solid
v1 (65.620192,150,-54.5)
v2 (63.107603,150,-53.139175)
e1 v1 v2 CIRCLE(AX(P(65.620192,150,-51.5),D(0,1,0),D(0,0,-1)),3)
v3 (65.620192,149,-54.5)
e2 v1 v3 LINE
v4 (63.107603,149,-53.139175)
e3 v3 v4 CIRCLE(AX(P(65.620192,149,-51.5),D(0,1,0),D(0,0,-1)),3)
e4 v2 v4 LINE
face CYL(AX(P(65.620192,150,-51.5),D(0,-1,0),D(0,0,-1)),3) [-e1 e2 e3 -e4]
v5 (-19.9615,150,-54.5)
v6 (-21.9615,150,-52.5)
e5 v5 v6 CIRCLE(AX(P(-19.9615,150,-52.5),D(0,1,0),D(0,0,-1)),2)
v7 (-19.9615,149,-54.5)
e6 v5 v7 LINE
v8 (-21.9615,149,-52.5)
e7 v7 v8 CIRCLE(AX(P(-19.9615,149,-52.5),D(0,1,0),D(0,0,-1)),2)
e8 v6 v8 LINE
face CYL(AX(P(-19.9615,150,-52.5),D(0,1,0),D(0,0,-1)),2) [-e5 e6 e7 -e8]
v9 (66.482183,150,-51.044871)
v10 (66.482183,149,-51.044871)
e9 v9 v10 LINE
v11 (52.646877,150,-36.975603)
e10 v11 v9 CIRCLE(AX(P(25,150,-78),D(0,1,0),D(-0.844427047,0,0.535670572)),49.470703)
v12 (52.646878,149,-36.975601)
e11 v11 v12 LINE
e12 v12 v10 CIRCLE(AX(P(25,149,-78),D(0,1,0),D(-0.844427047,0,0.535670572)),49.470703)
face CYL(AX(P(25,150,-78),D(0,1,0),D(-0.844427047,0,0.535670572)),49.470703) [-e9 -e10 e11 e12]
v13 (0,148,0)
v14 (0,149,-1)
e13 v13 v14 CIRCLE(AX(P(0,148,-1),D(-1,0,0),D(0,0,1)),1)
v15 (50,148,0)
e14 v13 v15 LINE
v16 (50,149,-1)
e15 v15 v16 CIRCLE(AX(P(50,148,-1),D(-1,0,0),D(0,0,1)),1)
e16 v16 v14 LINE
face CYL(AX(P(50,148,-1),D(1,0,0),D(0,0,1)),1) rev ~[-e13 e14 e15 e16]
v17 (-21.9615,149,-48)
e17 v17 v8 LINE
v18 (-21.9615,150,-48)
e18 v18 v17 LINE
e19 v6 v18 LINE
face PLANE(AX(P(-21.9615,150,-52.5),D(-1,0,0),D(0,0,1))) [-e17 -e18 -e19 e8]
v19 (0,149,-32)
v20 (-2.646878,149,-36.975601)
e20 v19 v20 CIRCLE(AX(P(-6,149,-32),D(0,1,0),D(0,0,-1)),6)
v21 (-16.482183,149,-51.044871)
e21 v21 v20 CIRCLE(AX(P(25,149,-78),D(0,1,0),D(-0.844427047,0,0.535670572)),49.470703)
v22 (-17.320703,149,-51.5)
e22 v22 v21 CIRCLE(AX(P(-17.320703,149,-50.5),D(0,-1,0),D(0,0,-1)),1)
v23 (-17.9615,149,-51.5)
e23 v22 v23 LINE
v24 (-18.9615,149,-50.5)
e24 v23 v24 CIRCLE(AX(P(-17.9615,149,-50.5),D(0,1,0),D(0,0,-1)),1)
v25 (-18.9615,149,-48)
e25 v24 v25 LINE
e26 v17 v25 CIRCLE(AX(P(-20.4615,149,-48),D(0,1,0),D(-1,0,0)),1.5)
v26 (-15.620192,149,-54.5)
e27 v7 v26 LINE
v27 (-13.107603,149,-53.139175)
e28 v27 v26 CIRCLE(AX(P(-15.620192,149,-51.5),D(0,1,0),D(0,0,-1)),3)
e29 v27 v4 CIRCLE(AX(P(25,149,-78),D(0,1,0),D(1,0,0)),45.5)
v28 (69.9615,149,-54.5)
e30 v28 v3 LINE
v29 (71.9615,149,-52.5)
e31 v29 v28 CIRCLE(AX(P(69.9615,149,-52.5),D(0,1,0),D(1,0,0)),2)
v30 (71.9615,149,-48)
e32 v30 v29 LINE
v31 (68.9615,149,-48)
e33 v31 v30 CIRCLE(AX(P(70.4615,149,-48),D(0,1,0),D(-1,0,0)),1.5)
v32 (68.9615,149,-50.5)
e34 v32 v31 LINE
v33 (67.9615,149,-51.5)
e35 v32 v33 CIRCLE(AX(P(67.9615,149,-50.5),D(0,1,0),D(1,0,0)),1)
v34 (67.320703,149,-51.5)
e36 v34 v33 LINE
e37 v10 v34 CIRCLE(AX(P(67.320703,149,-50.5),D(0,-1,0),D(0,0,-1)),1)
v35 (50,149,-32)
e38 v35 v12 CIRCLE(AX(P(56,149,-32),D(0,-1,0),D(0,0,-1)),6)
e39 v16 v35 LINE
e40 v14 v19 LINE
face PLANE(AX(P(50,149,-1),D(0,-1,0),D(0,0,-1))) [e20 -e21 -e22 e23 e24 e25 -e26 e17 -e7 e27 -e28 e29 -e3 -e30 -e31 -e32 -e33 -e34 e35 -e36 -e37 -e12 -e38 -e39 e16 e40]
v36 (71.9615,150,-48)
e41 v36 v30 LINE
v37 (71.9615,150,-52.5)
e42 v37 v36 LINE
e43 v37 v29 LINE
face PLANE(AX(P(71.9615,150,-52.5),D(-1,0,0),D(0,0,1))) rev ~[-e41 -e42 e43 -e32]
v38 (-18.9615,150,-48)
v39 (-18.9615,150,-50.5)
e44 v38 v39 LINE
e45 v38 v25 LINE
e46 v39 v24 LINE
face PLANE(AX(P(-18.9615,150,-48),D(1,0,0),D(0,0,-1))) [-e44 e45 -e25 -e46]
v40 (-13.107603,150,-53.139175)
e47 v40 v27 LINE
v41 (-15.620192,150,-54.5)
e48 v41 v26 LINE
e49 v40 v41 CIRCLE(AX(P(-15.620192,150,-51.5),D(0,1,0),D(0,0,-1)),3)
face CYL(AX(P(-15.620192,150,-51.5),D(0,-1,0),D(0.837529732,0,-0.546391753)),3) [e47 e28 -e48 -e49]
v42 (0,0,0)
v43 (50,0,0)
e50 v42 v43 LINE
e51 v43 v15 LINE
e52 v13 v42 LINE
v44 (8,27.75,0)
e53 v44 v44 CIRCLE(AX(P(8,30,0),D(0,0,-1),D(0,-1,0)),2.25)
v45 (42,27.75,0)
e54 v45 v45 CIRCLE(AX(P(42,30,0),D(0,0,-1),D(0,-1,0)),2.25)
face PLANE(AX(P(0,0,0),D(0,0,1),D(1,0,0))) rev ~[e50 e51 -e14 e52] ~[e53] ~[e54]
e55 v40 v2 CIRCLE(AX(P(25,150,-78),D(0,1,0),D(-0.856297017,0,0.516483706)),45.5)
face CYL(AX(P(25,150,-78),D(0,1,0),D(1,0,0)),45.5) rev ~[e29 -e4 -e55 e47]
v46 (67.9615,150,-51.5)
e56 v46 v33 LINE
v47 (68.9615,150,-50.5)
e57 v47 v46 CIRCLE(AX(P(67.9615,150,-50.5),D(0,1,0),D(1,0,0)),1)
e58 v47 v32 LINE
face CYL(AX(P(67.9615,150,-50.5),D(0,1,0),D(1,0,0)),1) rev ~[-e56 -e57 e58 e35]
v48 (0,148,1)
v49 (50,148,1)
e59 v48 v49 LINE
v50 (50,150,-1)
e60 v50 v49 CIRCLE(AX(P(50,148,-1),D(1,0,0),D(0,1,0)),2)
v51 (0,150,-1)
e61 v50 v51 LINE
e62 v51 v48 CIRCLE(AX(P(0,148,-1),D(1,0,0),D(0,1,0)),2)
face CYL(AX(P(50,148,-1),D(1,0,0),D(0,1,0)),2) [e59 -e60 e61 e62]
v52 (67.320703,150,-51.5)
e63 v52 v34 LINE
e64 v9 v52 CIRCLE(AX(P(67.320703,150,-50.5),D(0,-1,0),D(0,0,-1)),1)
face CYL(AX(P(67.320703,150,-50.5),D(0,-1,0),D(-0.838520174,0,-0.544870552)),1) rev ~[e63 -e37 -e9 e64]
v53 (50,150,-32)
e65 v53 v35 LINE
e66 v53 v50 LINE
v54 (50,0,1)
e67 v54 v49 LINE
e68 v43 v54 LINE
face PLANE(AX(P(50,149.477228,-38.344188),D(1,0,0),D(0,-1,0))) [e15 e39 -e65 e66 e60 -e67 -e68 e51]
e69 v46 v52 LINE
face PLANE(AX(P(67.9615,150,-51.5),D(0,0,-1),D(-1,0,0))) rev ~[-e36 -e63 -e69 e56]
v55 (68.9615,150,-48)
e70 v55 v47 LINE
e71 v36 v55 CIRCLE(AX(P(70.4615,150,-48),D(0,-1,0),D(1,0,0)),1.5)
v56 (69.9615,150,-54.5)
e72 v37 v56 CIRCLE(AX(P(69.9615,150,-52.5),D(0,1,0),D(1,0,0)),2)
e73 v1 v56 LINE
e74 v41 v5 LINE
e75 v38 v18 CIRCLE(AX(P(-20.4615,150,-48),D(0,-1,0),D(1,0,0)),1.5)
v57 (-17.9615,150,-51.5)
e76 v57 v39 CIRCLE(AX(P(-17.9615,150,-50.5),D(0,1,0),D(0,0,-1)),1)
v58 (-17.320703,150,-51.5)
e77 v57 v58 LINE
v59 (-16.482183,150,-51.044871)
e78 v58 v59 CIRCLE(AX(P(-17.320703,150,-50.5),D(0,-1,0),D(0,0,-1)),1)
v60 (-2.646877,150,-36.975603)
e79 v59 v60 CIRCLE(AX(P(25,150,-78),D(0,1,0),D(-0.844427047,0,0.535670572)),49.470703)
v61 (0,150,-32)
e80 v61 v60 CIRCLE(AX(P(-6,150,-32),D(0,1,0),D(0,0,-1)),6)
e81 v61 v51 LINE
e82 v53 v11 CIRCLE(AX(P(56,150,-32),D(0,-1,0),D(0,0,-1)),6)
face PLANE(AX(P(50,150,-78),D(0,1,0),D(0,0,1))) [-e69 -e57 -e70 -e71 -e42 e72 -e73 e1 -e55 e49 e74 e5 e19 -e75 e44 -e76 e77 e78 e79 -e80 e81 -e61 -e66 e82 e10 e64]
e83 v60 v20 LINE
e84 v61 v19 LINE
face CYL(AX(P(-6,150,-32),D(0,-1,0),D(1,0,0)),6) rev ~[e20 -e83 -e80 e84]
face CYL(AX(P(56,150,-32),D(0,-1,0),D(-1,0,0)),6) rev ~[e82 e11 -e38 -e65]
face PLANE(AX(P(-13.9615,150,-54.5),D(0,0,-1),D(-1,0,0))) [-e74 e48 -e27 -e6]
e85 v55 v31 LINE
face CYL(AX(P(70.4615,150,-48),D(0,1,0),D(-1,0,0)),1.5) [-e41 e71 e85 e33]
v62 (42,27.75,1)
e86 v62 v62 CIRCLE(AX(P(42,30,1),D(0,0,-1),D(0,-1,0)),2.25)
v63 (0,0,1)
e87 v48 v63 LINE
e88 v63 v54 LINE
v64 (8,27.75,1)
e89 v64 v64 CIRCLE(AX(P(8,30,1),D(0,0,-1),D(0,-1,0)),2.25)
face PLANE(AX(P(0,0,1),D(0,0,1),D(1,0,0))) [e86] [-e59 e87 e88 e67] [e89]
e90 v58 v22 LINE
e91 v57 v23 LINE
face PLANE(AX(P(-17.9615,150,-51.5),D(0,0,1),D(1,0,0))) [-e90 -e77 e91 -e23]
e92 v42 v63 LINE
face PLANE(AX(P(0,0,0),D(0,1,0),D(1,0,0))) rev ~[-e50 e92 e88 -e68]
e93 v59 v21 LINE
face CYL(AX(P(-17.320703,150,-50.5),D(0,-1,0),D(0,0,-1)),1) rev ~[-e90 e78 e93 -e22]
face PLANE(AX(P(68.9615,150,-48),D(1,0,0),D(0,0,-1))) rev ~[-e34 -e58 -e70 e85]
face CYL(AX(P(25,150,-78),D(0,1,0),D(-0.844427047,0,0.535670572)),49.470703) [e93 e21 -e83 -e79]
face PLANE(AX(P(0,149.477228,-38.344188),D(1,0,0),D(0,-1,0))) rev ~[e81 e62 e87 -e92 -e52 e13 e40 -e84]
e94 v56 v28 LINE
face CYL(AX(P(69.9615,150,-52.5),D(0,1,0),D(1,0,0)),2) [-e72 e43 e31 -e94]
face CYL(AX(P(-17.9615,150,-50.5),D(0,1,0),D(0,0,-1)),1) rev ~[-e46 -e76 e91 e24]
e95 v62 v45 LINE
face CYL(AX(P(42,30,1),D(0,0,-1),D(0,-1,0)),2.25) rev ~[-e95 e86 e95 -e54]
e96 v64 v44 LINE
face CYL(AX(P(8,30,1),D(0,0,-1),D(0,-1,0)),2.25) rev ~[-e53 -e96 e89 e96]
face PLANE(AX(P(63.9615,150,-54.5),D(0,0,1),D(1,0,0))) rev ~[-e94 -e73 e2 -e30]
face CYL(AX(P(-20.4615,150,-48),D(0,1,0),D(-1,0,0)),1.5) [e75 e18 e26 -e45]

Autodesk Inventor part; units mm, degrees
ref_plane "YZ Plane" through (0, 0, 0) normal (1, 0, 0) x (0, 1, 0)
ref_plane "XZ Plane" through (0, 0, 0) normal (0, 1, 0) x (-1, 0, 0)
ref_plane "XY Plane" through (0, 0, 0) normal (0, 0, 1) x (1, 0, 0)
sketch "Sketch1" plane through (0, 0, 0) normal (0, 0, 1) x (1, 0, 0)
  line L0 (0, 0) -> (50, 0)
  line L1 (50, 0) -> (50, 150)
  line L2 (50, 150) -> (0, 150)
  line L3 (0, 150) -> (0, 0)
  dimension "d0" = 50
  dimension "d1" = 150
extrude "Plate1" add sketch "Sketch1" along normal blind 1
sketch "Sketch2" plane through (50, 149, 1) normal (0, 1, 0) x (-1, 0, 0)
  line L0 (50, 0) -> (0, 0)
  line L1 (0, 0) -> (0, -79)
  line L2 (0, -79) -> (50, -79)
  line L3 (50, -79) -> (50, 0)
edge flange "Flange1" height 79 angle 90 thickness 1 bend radius 1 thickness toward (0, 1, 0) relief tear relief width 1 relief depth 0.5 edges at (25, 150, 0) wall of the first edge with corners at (0, 149, 1) (50, 149, 1) (50, 149, -78) (0, 149, -78)
bend "Bend1"
corner "Corner1"
sketch "Sketch4" plane through (0, 150, -78) normal (0, 1, 0) x (1, 0, 0)
  line L0 (0, 0) -> (50, 0)
  line L1 (0, 0) -> (-40, 0)
  line L2 (-40, 0) -> (-40, -40)
  line L3 (-40, -40) -> (0, -40)
  line L4 (0, -40) -> (0, 0)
  line L5 (50, -77) -> (50, 0)
  line L6 (50, 0) -> (90, 0)
  line L7 (90, 0) -> (90, -40)
  line L8 (90, -40) -> (50, -40)
  line L9 (50, -40) -> (50, 0)
  point P0 (0, -78)
  dimension "d14" = 40
  dimension "d15" = 40
  dimension "d16" = 40
  dimension "d17" = 40
sheet face with bend "Face2" sketch "Sketch4" thickness 1 toward (0, -1, 0) bend radius 1
bend "Bend2"
fillet "Corner Round7" radius 6 2 edges at (50, 149.5, -38) (0, 149.5, -38)
sketch "Sketch3" plane through (0, 150, -78) normal (0, 1, 0) x (1, 0, 0)
  line L0 (0, 0) -> (50, 0) projected
  circle A0 centre (25, 0) radius 45.5
  arc A1 (-16.7744, -26.5) -> (66.7744, -26.5) centre (25, 0) ccw
  arc A2 (0, -46) -> (-6, -40) centre (-6, -46) ccw projected
  circle A3 centre (-6, -46) radius 6
  arc A4 (56, -40) -> (50, -46) centre (56, -46) ccw projected
  circle A5 centre (56, -46) radius 6
  line L1 (-40, -40) -> (-6, -40) projected
  line L2 (-6, -40) -> (-40, -40)
  line L3 (-40, 0) -> (-40, -40) projected
  line L4 (-40, -40) -> (-40, 0)
  line L5 (-40, 0) -> (-20.5, 0)
  line L6 (90, 0) -> (-40, 0) projected
  line L7 (56, -40) -> (90, -40) projected
  line L8 (56, -40) -> (90, -40)
  line L9 (90, -40) -> (90, 0) projected
  line L10 (90, -40) -> (90, 0)
  line L11 (90, 0) -> (70.5, 0)
  line L12 (25, 0) -> (25, -45.5)
  line L13 (25, -45.5) -> (25, -23.5) construction
  line L14 (25, -23.5) -> (63.9615, -23.5) construction
  line L15 (63.9615, -23.5) -> (69.9615, -23.5)
  line L16 (63.9615, -23.5) -> (69.9615, -23.5) construction
  line L17 (71.9615, -25.5) -> (71.9615, -30)
  line L18 (70.4615, -31.5) -> (70.4615, -31.5)
  line L19 (25, -23.5) -> (-13.9615, -23.5) construction
  line L20 (-13.9615, -23.5) -> (-19.9615, -23.5)
  line L21 (-13.9615, -23.5) -> (-7.9615, -23.5) construction
  line L22 (-21.9615, -25.5) -> (-21.9615, -30)
  line L23 (-20.4615, -31.5) -> (-20.4615, -31.5)
  arc A6 (-16.7744, -26.5) -> (66.7744, -26.5) centre (25, 0) ccw
  line L24 (-18.9615, -30) -> (-18.9615, -27.5)
  line L25 (-17.9615, -26.5) -> (-16.7744, -26.5)
  line L26 (68.9615, -30) -> (68.9615, -27.5)
  line L27 (67.9615, -26.5) -> (66.7744, -26.5)
  arc A7 (-19.9615, -23.5) -> (-21.9615, -25.5) centre (-19.9615, -25.5) ccw
  arc A8 (-21.9615, -30) -> (-20.4615, -31.5) centre (-20.4615, -30) ccw
  arc A9 (-20.4615, -31.5) -> (-18.9615, -30) centre (-20.4615, -30) ccw
  arc A10 (-17.9615, -26.5) -> (-18.9615, -27.5) centre (-17.9615, -27.5) ccw
  arc A11 (71.9615, -25.5) -> (69.9615, -23.5) centre (69.9615, -25.5) ccw
  arc A12 (70.4615, -31.5) -> (71.9615, -30) centre (70.4615, -30) ccw
  arc A13 (68.9615, -30) -> (70.4615, -31.5) centre (70.4615, -30) ccw
  arc A14 (68.9615, -27.5) -> (67.9615, -26.5) centre (67.9615, -27.5) ccw
  point P0 (0, -78)
  point P1 (52.6469, -41.0244)
  point P2 (-2.6469, -41.0244)
  point P3 (71.9615, -23.5)
  point P4 (71.9615, -31.5)
  point P5 (68.9615, -31.5)
  point P6 (-21.9615, -23.5)
  point P7 (-21.9615, -31.5)
  point P8 (-18.9615, -31.5)
  point P9 (-18.9615, -26.5)
  point P10 (68.9615, -26.5)
  point P11 (-2.6469, -41.0244)
  point P12 (52.6469, -41.0244)
  point P13 (70.4615, -31.5)
  dimension "d13" = 91
  dimension "d84" = 22
  dimension "d85" = 8
  dimension "d86" = 0
  dimension "d87" = 8
  dimension "d88" = 3
  dimension "d89" = 8
  dimension "d90" = 180
  dimension "d91" = 8
  dimension "d92" = 90
  dimension "d93" = 3
  dimension "d95" = 5
  dimension "d96" = 5
  dimension "d97" = 2
  dimension "d98" = 1.5
  dimension "d99" = 1.5
  dimension "d100" = 1
  dimension "d101" = 2
  dimension "d102" = 1.5
  dimension "d103" = 1
extrude "Extrusion1" cut sketch "Sketch3" against normal through all contours L6 A0 L0 | L0 L12 A0 L6 | L0 L6 A0 L12 | A0 L20 A7 L22 A8 A9 L24 A10 L25 A1 A2 L1 L3 L5 | L6 L9 L7 A4 A1 L27 A14 L26 A13 A12 L17 A11 L15 A0
sketch "Sketch5" plane through (0, 150, -1) normal (0, 1, 0) x (1, 0, 0)
  arc A0 (-13.9615, 53.5) -> (63.9615, 53.5) centre (25, 77) ccw projected
  point P0 (0, -1)
  point P1 (70.5, 77)
  point P2 (-20.5, 77)
sketch "Sketch7" plane through (0, 0, 1) normal (0, 0, 1) x (1, 0, 0)
  line L0 (50, 0) -> (0, 0) projected
  line L1 (0, 0) -> (0, 148) projected
  line L2 (50, 148) -> (50, 0) projected
  point P0 (8, 30)
  point P1 (42, 30)
  dimension "d37" = 30
  dimension "d38" = 8
  dimension "d39" = 8
hole "Hole1" at (8, 30, 1) at (42, 30, 1) direction (0, 0, -1) diameter 4.5 end through all
fillet "Corner Round12" radius 1 1 edges at (-16.7744, 149.5, -51.5)
fillet "Corner Round13" radius 1 1 edges at (66.7744, 149.5, -51.5)
fillet "Corner Round14" radius 3 1 edges at (63.9615, 149.5, -54.5)
fillet "Corner Round15" radius 3 1 edges at (-13.9615, 149.5, -54.5)
sketch "Sketch10" plane through (0, 150, -1) normal (0, 1, 0) x (1, 0, 0)
  arc A0 (70.7921, 70.1608) -> (-20.7921, 70.1608) centre (25, 77) ccw
  line L0 (25, 77) -> (25, 30.7) construction
  line L1 (-17.3207, 50.5) -> (-17.9615, 50.5) projected
  line L2 (-18.9615, 47) -> (-18.9615, 49.5) projected
  line L3 (-17.6615, 49.2) -> (-20.7921, 70.1608)
  line L4 (-20.7921, 70.1608) -> (25, 70.1608) construction
  line L5 (68.9615, 49.5) -> (68.9615, 47) projected
  line L6 (67.3207, 50.5) -> (67.9615, 50.5) projected
  line L7 (67.6615, 49.2) -> (70.7921, 70.1608)
  line L8 (70.7921, 70.1608) -> (25, 70.1608) construction
  point P0 (0, -1)
  dimension "d109" = 92.6
  dimension "d115" = 1.3
  dimension "d116" = 1.3
  dimension "d117" = 45.7921
  dimension "d118" = 6.8392
  dimension "d119" = 1.3
  dimension "d120" = 1.3
  dimension "d121" = 45.7921
equation "\"d39\" = d38"
equation "\"d16\" = d14"
equation "\"d17\" = d15"
equation "\"d45\" = Thickness"
equation "\"d2\" = Thickness"
equation "\"d3\" = BendReliefWidth"
equation "\"d4\" = BendReliefDepth"
equation "\"d5\" = MinimumRemnant"
equation "\"d6\" = TransitionRadius"
equation "\"d9\" = BendRadius"
equation "\"d10\" = CornerReliefSize"
equation "\"d11\" = GapSize"
equation "\"d12\" = JacobiRadiusSize"
equation "\"d18\" = BendRadius"
equation "\"d19\" = BendReliefWidth"
equation "\"d21\" = MinimumRemnant"
equation "\"d20\" = BendReliefDepth"
equation "\"d22\" = TransitionRadius"
equation "\"BendRadius\" = Thickness"
equation "\"BendReliefWidth\" = Thickness"
equation "\"BendReliefDepth\" = 0.5 * Thickness"
equation "\"CornerReliefSize\" = 4 * Thickness"
equation "\"MinimumRemnant\" = 2 * Thickness"
equation "\"TransitionRadius\" = BendRadius"
equation "\"JacobiRadiusSize\" = BendRadius"
equation "\"GapSize\" = Thickness"
equation "\"Thickness\" = 1"
properties part number "Sujetador Vaso" material "Steel, Carbon"
